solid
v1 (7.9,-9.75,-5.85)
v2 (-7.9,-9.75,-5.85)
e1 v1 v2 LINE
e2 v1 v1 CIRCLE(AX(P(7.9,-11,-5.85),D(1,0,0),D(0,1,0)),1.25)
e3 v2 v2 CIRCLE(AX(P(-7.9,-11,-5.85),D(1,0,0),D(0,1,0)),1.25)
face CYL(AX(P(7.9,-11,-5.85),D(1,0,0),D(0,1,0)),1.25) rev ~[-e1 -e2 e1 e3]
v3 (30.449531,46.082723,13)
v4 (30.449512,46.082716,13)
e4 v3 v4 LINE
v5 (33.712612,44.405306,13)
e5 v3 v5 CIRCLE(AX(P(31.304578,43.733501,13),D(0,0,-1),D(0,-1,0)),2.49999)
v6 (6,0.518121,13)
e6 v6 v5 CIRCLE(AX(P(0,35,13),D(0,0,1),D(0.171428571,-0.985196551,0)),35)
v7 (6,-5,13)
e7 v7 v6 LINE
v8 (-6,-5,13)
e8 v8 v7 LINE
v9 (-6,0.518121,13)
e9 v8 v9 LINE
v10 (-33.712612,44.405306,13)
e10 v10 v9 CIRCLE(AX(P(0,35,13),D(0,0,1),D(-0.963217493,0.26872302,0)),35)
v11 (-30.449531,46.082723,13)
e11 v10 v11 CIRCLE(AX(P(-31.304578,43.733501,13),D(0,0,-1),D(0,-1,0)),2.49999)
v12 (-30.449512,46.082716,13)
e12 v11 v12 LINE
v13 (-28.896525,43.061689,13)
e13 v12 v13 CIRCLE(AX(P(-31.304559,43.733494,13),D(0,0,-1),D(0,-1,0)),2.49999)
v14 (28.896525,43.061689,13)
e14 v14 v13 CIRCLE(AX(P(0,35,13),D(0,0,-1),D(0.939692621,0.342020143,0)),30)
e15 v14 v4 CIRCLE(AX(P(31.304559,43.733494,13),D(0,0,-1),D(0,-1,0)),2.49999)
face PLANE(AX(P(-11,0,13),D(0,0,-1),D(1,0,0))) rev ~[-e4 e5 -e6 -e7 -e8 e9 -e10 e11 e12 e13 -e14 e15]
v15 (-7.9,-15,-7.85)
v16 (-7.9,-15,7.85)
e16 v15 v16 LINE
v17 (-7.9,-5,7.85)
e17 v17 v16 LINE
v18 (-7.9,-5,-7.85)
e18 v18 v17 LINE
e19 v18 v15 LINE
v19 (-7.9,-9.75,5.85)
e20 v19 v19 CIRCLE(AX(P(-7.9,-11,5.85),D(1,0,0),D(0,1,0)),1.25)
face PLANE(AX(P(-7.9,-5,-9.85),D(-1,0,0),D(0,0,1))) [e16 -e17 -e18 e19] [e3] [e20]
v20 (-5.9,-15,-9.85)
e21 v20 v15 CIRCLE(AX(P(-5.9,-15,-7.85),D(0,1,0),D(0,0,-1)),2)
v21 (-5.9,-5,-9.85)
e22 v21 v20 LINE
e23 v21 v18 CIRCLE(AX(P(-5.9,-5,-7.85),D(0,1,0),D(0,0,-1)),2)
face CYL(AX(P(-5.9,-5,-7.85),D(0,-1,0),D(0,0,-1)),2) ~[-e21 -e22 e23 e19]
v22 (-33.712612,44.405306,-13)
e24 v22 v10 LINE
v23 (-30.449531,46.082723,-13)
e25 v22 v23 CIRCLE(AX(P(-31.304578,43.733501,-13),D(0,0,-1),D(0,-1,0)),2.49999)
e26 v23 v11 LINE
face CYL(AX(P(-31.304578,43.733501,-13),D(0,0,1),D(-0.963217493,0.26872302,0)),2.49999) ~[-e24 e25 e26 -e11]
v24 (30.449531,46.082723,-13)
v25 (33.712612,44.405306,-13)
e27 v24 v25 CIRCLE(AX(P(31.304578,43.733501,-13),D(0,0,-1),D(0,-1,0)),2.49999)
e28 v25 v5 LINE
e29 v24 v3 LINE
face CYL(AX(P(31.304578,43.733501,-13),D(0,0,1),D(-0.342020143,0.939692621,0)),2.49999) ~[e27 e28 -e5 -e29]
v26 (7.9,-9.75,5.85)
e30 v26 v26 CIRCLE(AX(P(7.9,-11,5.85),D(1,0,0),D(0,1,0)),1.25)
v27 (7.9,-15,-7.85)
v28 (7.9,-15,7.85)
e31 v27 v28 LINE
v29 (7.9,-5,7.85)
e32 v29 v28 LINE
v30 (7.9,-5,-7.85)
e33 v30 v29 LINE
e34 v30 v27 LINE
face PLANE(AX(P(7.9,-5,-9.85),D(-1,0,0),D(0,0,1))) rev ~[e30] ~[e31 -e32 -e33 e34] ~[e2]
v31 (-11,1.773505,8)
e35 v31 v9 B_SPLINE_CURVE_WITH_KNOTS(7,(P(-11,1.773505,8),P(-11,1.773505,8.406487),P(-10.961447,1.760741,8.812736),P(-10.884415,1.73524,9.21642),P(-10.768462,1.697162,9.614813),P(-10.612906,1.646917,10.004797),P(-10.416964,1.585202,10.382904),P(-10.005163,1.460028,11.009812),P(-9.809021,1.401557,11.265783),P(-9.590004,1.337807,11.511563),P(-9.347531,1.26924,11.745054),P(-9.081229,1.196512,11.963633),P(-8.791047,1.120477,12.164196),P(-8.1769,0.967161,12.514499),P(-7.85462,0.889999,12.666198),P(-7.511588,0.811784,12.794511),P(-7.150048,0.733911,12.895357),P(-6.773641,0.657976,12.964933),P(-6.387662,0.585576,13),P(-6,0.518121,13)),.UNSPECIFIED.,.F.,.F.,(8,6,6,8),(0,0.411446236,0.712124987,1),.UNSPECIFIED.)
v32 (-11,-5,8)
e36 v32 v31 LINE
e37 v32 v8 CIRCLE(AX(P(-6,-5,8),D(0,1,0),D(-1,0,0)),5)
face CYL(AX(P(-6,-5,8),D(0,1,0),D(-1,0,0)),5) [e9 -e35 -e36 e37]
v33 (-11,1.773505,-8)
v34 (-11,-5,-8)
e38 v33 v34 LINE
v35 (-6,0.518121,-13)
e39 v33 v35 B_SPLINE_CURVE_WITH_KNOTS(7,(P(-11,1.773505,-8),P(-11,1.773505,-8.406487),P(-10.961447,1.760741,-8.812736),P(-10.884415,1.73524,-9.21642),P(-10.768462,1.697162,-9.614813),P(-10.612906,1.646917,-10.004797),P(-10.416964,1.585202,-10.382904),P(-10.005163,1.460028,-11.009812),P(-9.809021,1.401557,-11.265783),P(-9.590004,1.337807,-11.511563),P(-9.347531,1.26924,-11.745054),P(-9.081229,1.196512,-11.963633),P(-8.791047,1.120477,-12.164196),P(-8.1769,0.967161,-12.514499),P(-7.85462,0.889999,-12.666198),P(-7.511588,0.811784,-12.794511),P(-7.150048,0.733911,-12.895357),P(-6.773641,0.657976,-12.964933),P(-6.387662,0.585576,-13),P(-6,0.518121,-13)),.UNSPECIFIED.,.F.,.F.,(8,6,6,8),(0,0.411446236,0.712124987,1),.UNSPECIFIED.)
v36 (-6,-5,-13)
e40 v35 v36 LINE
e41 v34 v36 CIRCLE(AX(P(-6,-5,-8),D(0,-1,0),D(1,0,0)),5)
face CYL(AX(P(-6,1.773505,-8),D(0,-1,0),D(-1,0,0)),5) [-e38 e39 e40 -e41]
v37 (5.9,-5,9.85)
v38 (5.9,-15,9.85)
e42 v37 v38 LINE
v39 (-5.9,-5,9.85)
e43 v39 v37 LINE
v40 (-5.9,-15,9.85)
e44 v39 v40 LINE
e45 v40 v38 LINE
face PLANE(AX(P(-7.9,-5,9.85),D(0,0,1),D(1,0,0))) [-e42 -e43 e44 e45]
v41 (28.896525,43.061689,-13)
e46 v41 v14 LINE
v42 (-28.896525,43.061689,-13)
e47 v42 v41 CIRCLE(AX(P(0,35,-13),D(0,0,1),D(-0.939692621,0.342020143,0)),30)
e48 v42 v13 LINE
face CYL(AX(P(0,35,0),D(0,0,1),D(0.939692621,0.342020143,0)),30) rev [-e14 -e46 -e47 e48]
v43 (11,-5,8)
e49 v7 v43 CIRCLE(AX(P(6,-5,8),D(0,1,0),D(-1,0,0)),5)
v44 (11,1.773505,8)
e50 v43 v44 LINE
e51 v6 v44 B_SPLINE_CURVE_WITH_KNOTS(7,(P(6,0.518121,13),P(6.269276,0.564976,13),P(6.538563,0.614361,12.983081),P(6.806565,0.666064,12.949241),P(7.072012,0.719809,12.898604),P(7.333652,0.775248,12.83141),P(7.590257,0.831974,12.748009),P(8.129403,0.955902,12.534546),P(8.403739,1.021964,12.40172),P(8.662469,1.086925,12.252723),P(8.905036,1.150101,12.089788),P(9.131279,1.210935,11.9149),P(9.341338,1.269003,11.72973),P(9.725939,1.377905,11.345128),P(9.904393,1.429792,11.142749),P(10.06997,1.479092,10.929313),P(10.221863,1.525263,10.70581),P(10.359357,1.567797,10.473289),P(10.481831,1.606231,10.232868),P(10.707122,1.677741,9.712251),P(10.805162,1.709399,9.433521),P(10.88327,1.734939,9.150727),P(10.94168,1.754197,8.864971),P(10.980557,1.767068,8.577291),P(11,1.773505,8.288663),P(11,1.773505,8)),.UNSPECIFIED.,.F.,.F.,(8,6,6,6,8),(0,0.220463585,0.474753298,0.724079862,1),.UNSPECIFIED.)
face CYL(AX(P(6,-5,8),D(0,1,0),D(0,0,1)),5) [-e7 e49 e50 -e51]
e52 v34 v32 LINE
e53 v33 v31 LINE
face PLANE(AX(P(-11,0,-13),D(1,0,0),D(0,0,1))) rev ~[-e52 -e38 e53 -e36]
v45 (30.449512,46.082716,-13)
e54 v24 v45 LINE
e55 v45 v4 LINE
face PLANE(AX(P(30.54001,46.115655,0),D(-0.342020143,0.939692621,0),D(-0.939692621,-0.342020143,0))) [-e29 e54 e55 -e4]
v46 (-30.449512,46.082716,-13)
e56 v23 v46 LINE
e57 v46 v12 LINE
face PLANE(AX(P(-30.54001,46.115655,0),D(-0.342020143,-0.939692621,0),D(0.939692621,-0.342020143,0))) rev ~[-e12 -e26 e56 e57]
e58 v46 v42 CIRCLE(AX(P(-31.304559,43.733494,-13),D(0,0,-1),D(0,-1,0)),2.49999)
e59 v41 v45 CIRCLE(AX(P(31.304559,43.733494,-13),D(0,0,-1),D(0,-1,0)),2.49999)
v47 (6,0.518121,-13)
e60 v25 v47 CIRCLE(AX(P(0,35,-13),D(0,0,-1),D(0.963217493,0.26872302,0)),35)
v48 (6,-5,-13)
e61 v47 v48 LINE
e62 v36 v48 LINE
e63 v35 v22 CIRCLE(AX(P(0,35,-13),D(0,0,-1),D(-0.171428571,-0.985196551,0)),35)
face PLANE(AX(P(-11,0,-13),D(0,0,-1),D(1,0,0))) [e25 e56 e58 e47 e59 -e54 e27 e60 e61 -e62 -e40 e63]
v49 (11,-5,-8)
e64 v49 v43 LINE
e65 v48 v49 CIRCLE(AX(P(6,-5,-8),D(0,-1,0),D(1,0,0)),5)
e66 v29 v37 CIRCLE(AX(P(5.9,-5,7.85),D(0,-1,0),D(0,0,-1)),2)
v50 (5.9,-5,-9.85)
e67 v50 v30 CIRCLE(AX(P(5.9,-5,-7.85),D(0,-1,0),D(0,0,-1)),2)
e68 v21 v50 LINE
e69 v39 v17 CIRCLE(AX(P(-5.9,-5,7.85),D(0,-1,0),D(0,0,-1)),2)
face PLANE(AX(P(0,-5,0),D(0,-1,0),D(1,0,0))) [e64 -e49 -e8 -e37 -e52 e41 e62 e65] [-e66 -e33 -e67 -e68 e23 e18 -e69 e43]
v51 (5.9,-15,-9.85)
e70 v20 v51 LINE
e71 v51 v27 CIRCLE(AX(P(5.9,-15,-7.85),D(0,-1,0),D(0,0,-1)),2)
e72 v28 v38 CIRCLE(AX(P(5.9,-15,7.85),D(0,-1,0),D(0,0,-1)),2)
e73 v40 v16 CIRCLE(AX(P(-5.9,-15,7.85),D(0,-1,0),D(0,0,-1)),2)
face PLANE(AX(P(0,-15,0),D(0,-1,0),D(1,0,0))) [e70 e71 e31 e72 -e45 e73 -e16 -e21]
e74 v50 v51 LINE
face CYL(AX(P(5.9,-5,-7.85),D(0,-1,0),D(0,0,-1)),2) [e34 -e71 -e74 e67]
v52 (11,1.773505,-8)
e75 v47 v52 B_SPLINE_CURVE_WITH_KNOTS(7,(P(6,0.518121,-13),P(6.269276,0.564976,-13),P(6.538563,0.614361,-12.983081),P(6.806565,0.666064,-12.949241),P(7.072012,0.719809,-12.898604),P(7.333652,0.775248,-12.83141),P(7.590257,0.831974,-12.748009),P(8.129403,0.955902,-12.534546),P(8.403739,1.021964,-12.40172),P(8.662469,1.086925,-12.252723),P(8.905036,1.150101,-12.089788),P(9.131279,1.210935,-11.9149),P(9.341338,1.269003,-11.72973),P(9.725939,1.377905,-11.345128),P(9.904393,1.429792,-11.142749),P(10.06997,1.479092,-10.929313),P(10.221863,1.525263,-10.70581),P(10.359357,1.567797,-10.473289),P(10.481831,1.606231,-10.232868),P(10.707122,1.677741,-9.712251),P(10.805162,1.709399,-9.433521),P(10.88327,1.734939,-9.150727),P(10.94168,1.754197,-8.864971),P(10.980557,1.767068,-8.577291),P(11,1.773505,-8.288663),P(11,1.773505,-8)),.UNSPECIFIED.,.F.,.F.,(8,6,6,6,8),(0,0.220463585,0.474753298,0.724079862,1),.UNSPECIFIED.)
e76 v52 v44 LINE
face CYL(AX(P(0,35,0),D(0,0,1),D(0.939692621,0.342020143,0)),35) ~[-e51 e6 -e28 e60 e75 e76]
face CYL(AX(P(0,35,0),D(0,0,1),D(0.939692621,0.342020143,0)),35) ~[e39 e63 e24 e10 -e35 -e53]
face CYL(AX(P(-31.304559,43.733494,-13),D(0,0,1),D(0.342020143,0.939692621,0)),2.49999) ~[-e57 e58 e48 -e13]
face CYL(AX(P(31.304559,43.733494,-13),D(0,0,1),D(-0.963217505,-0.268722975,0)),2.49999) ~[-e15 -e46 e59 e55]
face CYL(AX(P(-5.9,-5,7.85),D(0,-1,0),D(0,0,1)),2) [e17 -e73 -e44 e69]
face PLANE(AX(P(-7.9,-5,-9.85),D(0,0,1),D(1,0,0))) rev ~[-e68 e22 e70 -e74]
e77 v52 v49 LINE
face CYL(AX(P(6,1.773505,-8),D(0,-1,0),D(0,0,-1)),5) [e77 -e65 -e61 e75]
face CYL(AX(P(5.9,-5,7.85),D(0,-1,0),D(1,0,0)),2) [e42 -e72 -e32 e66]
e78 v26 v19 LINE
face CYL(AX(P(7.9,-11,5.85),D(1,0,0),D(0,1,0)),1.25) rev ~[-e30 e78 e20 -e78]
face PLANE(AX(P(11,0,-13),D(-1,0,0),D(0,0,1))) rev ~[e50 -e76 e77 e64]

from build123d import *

# Parameters (mm, degrees)
F0_W          = 5
F0_H          = 26
F1_ANGLE_BACK = 110
F1_ANGLE      = 220
F2_W          = 22
F2_H          = 26
F3_DEPTH      = 5
F3_DEPTH_BACK = 5
F4_R          = 2.49999
F5_W          = 15.8
F5_H          = 19.7
F6_DEPTH      = 10
F7_R          = 1.25
F8_DEPTH      = 42.901
F9_R          = 2
F10_R         = 5


# Not quite as in the source:
# - a fillet or chamfer is up to 0.001 mm smaller than in the source, because OpenCascade refuses the exact size


with BuildPart() as f1:
    # F0 (on Right) → F1 (revolve)
    with BuildSketch(Plane.YZ, mode=Mode.PRIVATE) as f1_sk:
        with Locations((2.5, 0)):
            Rectangle(F0_W, F0_H)
    revolve(f1_sk.sketch.rotate(Axis((0, 35, 2.8591789305), (0, 0, -1)), -F1_ANGLE_BACK), axis=Axis((0, 35, 2.8591789305), (0, 0, -1)), revolution_arc=F1_ANGLE)

    # F2 (on Front) → F3 (join, two sides)
    with BuildSketch(Plane.XZ) as f3_sk:
        Rectangle(F2_W, F2_H)
    extrude(amount=F3_DEPTH)
    extrude(f3_sk.sketch, amount=-F3_DEPTH_BACK)

    # F4 (radius 2.5 in the source; OpenCascade refuses exactly that, so slightly less here)
    f4_edges = [f1.edges().sort_by_distance(p)[0] for p in [
        (32.889242, 46.970705, 0),
        (28.190779, 45.260604, 0),
        (-28.190779, 45.260604, 0),
        (-32.889242, 46.970705, 0),
    ]]
    fillet(f4_edges, radius=F4_R)

    # F5 (on face) → F6 (join)
    with BuildSketch(Plane.XZ.offset(5)):
        Rectangle(F5_W, F5_H)
    extrude(amount=F6_DEPTH)

    # F7 (on face) → F8 (cut, through all)
    with BuildSketch(Plane.YZ.offset(7.9)):
        with Locations((-11, 5.85)):
            Circle(F7_R)
        with Locations((-11, -5.85)):
            Circle(F7_R)
    extrude(amount=-F8_DEPTH, mode=Mode.SUBTRACT)

    # F9
    f9_edges = [f1.edges().sort_by_distance(p)[0] for p in [
        (7.9, -10, 9.85),
        (7.9, -10, -9.85),
        (-7.9, -10, -9.85),
        (-7.9, -10, 9.85),
    ]]
    fillet(f9_edges, radius=F9_R)

    # F10
    f10_edges = [f1.edges().sort_by_distance(p)[0] for p in [
        (-11, -1.613248, 13),
        (-11, -1.613248, -13),
        (11, -1.613248, -13),
        (11, -1.613248, 13),
    ]]
    fillet(f10_edges, radius=F10_R)


solid = f1.part
